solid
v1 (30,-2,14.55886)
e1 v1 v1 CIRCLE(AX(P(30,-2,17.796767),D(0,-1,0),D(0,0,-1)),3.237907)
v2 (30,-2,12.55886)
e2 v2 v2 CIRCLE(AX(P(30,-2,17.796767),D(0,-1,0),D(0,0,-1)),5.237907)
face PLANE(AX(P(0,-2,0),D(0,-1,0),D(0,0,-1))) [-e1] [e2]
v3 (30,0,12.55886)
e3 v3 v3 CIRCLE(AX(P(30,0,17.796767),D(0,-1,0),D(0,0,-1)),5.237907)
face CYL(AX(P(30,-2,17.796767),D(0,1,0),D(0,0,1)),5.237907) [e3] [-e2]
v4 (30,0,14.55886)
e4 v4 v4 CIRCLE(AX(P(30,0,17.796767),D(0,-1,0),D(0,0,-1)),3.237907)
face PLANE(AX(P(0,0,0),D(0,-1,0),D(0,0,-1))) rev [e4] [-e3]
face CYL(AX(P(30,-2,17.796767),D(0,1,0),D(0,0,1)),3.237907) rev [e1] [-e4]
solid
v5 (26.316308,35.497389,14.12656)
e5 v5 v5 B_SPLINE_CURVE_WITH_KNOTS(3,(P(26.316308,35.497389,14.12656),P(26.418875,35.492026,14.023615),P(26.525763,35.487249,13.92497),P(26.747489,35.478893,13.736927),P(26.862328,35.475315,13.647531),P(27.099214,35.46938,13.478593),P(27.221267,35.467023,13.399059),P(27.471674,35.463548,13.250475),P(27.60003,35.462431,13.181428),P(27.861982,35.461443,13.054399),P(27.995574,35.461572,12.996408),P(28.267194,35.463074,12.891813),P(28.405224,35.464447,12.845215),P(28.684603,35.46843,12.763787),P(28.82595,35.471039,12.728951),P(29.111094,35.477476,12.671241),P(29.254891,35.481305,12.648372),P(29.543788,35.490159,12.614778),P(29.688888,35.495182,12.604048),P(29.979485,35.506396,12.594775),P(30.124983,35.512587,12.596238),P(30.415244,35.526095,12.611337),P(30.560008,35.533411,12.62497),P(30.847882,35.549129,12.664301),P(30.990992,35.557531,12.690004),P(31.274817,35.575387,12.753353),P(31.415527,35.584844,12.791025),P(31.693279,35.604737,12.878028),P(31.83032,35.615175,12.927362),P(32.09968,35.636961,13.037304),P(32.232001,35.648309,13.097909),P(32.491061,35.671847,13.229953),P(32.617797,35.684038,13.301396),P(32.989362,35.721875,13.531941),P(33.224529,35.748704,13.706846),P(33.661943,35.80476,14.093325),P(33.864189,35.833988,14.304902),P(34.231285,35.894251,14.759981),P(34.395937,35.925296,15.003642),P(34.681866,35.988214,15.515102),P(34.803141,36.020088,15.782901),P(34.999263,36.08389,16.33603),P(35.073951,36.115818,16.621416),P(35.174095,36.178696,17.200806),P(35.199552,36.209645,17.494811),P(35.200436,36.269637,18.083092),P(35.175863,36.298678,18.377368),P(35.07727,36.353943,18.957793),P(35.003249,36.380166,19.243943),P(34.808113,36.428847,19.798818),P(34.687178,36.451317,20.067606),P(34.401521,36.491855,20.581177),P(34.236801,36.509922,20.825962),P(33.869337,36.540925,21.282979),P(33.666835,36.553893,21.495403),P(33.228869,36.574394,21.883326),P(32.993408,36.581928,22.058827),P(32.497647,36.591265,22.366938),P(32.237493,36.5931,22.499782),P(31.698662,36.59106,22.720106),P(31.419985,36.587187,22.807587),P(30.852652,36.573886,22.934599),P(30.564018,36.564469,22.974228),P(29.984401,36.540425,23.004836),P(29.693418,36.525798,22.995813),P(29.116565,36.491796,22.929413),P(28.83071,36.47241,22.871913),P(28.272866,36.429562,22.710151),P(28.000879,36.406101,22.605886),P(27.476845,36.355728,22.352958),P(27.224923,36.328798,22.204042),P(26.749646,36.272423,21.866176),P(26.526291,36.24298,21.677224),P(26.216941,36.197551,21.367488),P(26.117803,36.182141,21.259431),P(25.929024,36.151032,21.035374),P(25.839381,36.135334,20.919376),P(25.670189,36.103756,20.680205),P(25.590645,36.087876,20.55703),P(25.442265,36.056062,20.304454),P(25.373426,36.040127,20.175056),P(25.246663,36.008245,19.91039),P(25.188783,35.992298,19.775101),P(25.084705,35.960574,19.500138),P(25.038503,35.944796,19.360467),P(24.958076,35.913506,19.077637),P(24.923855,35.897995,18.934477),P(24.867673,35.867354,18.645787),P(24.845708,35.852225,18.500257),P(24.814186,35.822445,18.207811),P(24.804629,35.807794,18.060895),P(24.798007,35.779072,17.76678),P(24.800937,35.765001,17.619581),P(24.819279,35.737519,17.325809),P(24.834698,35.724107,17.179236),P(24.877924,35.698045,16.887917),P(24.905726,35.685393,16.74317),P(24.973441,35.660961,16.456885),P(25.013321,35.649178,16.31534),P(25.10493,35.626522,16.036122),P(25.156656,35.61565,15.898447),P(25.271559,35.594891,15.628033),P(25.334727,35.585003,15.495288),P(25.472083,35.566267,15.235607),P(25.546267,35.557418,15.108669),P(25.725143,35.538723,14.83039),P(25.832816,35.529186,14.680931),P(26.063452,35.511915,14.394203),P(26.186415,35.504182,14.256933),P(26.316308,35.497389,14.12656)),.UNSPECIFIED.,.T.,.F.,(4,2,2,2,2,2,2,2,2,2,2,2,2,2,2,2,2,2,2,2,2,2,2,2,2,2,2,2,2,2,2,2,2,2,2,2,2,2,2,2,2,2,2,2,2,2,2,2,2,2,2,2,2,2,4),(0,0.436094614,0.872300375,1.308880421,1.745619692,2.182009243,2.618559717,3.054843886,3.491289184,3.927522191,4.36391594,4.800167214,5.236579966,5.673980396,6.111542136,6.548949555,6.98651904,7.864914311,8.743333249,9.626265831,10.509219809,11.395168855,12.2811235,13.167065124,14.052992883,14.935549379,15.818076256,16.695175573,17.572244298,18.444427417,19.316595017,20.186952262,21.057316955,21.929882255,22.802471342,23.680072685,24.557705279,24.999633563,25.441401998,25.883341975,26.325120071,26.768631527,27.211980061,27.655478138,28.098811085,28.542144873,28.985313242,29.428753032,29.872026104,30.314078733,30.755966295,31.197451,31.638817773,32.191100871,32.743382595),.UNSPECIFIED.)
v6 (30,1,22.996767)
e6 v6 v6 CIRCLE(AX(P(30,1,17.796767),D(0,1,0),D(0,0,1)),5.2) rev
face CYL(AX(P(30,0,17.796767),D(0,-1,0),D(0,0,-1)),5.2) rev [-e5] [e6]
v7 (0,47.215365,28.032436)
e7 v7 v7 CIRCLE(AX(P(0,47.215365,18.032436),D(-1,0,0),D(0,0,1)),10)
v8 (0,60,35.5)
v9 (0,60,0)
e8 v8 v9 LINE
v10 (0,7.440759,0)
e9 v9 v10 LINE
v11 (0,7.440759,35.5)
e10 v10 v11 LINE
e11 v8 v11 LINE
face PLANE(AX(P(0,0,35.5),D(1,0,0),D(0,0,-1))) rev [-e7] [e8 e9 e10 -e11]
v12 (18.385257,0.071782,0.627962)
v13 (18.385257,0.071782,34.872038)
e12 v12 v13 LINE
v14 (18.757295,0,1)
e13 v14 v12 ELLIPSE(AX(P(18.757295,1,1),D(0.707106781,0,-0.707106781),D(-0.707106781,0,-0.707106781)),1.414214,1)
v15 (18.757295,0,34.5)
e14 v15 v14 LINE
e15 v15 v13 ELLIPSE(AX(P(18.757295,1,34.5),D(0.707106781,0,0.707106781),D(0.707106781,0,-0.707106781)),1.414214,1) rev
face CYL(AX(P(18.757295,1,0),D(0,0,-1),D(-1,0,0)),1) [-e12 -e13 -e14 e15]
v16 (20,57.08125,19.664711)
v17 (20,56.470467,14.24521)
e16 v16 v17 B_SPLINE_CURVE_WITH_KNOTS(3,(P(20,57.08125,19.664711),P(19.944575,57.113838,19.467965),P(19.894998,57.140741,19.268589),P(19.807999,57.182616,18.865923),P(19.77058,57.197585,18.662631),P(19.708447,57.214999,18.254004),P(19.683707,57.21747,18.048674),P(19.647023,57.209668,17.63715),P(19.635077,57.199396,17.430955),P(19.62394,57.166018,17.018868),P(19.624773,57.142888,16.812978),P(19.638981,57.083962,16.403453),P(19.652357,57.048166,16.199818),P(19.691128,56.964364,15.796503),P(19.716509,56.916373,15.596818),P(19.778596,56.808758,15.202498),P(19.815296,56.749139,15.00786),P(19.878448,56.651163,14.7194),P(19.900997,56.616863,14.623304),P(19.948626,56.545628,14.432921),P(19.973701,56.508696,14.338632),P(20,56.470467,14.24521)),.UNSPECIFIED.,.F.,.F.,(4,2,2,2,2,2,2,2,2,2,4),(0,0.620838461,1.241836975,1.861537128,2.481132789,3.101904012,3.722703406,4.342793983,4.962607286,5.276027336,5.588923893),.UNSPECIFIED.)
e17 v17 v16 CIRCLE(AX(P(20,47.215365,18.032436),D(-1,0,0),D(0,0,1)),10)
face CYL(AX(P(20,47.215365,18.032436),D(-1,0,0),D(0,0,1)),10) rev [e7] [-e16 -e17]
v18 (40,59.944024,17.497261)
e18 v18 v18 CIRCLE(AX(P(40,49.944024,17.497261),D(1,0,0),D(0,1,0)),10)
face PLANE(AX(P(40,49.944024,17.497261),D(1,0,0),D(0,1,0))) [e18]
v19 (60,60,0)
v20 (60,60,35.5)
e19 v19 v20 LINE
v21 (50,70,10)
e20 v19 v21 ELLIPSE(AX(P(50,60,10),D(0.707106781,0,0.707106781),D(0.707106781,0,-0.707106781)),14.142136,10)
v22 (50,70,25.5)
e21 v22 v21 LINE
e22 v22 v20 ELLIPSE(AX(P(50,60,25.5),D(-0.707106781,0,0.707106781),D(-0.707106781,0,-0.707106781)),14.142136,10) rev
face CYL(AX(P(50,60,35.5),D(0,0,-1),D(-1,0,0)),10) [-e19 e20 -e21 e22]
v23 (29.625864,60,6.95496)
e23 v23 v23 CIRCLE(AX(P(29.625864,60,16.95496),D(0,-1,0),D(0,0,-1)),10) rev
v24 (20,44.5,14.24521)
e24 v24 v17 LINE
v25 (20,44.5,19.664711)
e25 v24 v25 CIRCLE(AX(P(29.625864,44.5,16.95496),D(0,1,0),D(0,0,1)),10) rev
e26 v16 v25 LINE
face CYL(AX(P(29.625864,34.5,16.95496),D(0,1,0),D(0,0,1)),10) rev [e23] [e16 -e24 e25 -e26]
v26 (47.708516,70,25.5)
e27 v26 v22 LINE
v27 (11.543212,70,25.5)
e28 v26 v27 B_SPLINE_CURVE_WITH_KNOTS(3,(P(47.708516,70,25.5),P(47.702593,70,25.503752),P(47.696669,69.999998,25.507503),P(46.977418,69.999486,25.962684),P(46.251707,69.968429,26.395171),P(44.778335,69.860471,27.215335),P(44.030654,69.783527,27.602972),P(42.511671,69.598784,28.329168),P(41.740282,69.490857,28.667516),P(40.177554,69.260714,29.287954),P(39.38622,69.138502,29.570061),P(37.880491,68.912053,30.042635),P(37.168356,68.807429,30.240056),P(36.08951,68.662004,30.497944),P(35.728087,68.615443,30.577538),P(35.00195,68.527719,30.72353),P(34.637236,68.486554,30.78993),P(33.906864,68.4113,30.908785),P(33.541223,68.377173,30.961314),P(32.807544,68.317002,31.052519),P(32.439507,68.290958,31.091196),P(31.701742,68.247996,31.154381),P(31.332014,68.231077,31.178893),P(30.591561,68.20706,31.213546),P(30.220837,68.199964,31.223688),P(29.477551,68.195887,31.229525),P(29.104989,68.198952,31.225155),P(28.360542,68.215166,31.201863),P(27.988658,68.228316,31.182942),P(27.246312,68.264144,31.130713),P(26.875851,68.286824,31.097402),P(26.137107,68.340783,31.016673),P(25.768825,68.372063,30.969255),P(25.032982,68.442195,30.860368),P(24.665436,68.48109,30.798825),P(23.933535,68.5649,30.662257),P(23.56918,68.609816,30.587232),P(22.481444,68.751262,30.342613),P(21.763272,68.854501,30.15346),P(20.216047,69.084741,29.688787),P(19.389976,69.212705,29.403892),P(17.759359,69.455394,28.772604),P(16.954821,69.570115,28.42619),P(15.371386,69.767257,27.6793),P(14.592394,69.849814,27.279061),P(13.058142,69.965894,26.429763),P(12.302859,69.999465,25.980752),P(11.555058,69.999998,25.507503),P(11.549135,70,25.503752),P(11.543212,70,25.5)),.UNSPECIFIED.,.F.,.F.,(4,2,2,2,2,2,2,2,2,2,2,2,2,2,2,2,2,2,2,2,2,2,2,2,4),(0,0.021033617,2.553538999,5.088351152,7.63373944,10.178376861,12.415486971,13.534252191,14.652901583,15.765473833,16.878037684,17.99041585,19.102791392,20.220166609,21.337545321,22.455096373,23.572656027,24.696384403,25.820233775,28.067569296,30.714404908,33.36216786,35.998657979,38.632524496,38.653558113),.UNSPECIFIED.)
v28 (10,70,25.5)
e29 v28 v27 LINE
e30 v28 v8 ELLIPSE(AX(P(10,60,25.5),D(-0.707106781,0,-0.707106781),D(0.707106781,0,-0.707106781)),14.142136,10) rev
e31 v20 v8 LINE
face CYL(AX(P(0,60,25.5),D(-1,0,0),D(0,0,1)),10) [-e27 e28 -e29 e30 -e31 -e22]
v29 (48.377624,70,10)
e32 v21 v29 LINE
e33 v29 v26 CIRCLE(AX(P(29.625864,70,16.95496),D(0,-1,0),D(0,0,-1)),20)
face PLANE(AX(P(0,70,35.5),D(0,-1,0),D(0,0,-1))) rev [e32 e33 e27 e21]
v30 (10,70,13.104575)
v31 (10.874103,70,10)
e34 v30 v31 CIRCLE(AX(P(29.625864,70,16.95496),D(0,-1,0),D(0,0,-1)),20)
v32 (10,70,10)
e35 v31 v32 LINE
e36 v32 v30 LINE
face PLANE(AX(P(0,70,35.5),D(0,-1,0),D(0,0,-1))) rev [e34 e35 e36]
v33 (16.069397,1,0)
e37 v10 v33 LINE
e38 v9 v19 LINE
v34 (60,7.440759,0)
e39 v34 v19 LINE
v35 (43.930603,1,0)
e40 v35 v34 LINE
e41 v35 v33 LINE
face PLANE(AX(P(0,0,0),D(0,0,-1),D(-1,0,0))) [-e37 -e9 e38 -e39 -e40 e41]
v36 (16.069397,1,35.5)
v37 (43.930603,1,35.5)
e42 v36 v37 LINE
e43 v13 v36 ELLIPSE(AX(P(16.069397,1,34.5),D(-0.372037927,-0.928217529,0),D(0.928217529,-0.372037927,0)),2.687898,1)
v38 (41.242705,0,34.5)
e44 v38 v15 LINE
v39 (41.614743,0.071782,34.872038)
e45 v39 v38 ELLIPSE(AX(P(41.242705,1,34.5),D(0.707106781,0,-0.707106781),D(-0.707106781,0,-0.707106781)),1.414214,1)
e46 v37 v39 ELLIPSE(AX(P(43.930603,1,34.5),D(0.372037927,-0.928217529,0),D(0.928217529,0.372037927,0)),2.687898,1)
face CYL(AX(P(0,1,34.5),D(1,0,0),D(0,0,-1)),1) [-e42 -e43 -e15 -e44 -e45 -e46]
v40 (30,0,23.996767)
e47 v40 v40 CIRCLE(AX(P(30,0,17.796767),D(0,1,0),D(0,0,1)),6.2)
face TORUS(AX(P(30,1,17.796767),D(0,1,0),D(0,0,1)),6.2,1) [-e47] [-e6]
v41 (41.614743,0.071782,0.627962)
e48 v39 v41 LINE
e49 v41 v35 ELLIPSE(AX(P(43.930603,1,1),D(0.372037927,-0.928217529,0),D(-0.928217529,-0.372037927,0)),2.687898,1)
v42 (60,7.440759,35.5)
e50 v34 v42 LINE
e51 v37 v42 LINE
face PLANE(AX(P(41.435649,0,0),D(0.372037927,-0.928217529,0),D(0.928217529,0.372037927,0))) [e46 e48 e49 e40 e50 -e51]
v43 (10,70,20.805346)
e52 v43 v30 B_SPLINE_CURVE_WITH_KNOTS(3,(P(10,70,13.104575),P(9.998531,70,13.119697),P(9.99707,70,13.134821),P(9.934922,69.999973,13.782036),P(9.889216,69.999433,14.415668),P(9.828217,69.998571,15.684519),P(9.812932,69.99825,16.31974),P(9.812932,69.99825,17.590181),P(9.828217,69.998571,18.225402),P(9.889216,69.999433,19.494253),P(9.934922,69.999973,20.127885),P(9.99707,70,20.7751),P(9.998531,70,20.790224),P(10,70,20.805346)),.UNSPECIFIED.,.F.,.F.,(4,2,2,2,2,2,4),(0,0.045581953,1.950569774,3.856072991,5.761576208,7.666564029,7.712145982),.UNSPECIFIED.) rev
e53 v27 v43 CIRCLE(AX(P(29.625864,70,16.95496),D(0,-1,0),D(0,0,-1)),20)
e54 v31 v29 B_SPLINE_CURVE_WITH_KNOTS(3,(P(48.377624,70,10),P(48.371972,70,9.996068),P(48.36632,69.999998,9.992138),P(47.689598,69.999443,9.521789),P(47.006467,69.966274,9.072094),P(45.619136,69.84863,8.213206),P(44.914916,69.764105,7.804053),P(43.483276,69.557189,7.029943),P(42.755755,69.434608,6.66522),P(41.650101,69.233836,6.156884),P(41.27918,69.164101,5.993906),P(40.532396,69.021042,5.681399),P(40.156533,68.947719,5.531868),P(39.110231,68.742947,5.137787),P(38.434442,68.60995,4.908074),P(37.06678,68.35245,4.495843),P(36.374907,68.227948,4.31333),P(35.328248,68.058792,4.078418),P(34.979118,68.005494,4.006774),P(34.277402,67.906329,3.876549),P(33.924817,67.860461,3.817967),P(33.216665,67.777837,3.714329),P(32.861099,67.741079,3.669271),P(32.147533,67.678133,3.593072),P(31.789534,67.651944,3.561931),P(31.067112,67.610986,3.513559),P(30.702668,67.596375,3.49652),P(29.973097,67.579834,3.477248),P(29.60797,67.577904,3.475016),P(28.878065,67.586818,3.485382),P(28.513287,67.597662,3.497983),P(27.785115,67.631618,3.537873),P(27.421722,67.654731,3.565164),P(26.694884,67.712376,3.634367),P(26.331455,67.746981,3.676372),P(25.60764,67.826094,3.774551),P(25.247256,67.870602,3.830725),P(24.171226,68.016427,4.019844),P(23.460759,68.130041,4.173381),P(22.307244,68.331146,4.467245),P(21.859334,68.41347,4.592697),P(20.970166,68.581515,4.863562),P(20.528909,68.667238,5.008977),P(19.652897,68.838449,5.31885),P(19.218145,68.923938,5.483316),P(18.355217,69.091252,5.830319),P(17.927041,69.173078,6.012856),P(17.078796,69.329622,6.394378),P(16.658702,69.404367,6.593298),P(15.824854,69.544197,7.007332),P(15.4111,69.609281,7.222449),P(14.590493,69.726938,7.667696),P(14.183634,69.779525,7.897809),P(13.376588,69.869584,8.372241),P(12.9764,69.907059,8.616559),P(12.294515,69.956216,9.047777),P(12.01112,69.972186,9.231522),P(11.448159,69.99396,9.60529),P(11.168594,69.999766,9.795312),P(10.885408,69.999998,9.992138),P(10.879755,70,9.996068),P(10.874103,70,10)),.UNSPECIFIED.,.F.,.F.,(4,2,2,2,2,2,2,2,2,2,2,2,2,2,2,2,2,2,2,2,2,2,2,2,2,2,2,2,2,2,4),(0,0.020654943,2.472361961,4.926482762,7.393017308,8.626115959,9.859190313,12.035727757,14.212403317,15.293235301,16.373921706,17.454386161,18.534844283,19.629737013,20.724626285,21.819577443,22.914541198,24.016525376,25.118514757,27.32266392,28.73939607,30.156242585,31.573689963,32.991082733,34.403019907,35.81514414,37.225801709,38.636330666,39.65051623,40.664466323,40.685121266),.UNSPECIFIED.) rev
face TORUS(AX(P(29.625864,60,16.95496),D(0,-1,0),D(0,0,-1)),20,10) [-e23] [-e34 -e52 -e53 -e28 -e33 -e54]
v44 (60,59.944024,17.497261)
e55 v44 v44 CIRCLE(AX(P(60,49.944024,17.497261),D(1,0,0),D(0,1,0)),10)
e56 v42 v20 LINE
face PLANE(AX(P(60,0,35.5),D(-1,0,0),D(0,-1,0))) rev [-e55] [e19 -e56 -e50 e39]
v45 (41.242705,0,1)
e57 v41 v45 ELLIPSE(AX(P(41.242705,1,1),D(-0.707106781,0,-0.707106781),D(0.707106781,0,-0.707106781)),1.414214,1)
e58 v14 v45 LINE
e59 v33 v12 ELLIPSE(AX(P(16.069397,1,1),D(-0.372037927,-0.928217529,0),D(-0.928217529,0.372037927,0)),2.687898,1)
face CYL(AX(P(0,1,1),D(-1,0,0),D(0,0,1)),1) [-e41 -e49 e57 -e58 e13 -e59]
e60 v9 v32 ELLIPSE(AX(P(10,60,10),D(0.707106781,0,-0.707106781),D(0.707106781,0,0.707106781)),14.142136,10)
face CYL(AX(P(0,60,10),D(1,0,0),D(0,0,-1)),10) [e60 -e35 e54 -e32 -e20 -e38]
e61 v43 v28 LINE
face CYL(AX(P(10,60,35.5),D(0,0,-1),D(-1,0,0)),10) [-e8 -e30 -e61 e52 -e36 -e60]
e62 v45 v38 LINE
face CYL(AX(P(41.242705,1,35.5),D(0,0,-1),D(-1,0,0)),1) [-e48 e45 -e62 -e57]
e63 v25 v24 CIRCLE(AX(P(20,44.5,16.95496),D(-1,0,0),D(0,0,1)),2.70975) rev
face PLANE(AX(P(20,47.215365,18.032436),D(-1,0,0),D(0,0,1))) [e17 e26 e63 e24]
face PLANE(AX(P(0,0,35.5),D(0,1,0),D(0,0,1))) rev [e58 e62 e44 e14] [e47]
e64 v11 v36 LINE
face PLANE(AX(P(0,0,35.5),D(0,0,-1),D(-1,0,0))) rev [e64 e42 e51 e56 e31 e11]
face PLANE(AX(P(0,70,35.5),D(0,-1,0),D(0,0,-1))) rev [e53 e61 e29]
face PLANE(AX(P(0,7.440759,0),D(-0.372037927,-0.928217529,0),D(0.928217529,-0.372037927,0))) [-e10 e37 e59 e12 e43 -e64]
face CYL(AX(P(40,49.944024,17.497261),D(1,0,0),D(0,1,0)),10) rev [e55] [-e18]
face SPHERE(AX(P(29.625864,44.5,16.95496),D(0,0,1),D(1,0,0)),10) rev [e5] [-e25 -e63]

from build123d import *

# Parameters (mm, degrees)
SKETCH1_W                                  = 60
SKETCH1_H                                  = 70
BOSS_EXTRUDE1_DEPTH                        = 35.5
SKETCH3_R                                  = 10
CUT_EXTRUDE1_DEPTH                         = 35.5
FILLET1_R                                  = 10
SKETCH6_R                                  = 10
CUT_EXTRUDE6_DEPTH                         = 20
SKETCH7_R                                  = 10
CUT_EXTRUDE7_DEPTH                         = 20
CUT_EXTRUDE_THIN4_DEPTH                    = 99.793977717
CSK_FOR_M5_FLAT_HEAD_MACHINE_SCREW1_OUTL_R = 5.2
CSK_FOR_M5_FLAT_HEAD_MACHINE_SCREW1_DEPTH  = 36.592353538
FILLET2_R                                  = 1
SKETCH14_R                                 = 5.237907484
SKETCH14_R_2                               = 3.237907484
BOSS_EXTRUDE2_DEPTH                        = 2


# Read off the part's stored shape, not the designer's step: CSK for M5 Flat Head Machine Screw1
with BuildPart() as part:
    # Sketch1 → Boss-Extrude1 (new body)
    with BuildSketch(Plane.XY):
        with Locations((30, 35)):
            Rectangle(SKETCH1_W, SKETCH1_H)
    extrude(amount=BOSS_EXTRUDE1_DEPTH)

    # Sketch3 → Cut-Extrude1 (cut)
    with BuildSketch(Plane(origin=(0, 70, 0), x_dir=(1, 0, 0), z_dir=(0, 1, 0))):
        with Locations(Location((29.625863751, -16.954960471, 0), (0, 0, 270))):
            Circle(SKETCH3_R)
    extrude(amount=-CUT_EXTRUDE1_DEPTH, mode=Mode.SUBTRACT)

    # Fillet1
    # the kernel refuses this fillet: 10 mm, written as the material it adds along each edge
    with BuildSketch(Plane(origin=(29.625863751, 34.5, 16.954960471), x_dir=(0, 0, 1), z_dir=(-1, 0, 0))) as fillet1_piece_1:
        with BuildLine():
            CenterArc((10 - FILLET1_R, FILLET1_R), FILLET1_R, 270, 90)
            Line((10 - FILLET1_R, 0), (10, 0))
            Line((10, 0), (10, FILLET1_R))
        make_face()
    revolve(axis=Axis((29.625863751, 34.5, 16.954960471), (0, 1, 0)))
    # the kernel refuses this fillet: 10 mm, written as the material it takes off along each edge
    with BuildSketch(Plane(origin=(85, 70, 35.5), x_dir=(0, -1, 0), z_dir=(-1, 0, 0))) as fillet1_2_piece_1:
        with BuildLine():
            CenterArc((FILLET1_R, -FILLET1_R), FILLET1_R, 90, 90)
            Line((0, -FILLET1_R), (0, 0))
            Line((0, 0), (FILLET1_R, 0))
        make_face()
    extrude(amount=110, mode=Mode.SUBTRACT)
    with BuildSketch(Plane(origin=(29.625863751, 70, 16.954960471), x_dir=(0, 0, 1), z_dir=(-1, 0, 0))) as fillet1_2_piece_2:
        with BuildLine():
            CenterArc((10 + FILLET1_R, -FILLET1_R), FILLET1_R, 90, 90)
            Line((10, -FILLET1_R), (10, 0))
            Line((10, 0), (10 + FILLET1_R, 0))
        make_face()
    revolve(axis=Axis((29.625863751, 70, 16.954960471), (0, 1, 0)), mode=Mode.SUBTRACT)
    with BuildSketch(Plane(origin=(85, 70, 0), x_dir=(0, -1, 0), z_dir=(-1, 0, 0))) as fillet1_2_piece_3:
        with BuildLine():
            CenterArc((FILLET1_R, FILLET1_R), FILLET1_R, 180, 90)
            Line((0, FILLET1_R), (0, 0))
            Line((0, 0), (FILLET1_R, 0))
        make_face()
    extrude(amount=110, mode=Mode.SUBTRACT)
    with BuildSketch(Plane(origin=(0, 70, -25), x_dir=(0, -1, 0), z_dir=(0, 0, 1))) as fillet1_2_piece_4:
        with BuildLine():
            CenterArc((FILLET1_R, FILLET1_R), FILLET1_R, 180, 90)
            Line((0, FILLET1_R), (0, 0))
            Line((0, 0), (FILLET1_R, 0))
        make_face()
    extrude(amount=85.5, mode=Mode.SUBTRACT)
    with BuildSketch(Plane(origin=(60, 70, -25), x_dir=(0, -1, 0), z_dir=(0, 0, 1))) as fillet1_2_piece_5:
        with BuildLine():
            CenterArc((FILLET1_R, -FILLET1_R), FILLET1_R, 90, 90)
            Line((0, -FILLET1_R), (0, 0))
            Line((0, 0), (FILLET1_R, 0))
        make_face()
    extrude(amount=85.5, mode=Mode.SUBTRACT)

    # Sketch6 → Cut-Extrude6 (cut)
    with BuildSketch(Plane(origin=(60, 0, 0), x_dir=(0, 0, -1), z_dir=(1, 0, 0))):
        with Locations(Location((-17.49726075, 49.944024106, 0), (0, 0, 90))):
            Circle(SKETCH6_R)
    extrude(amount=-CUT_EXTRUDE6_DEPTH, mode=Mode.SUBTRACT)

    # Sketch7 → Cut-Extrude7 (cut)
    with BuildSketch(Plane.ZY):
        with Locations((18.032436188, 47.215365125)):
            Circle(SKETCH7_R)
    extrude(amount=-CUT_EXTRUDE7_DEPTH, mode=Mode.SUBTRACT)

    # Sketch11 → Cut-Extrude-Thin4 (cut, through all)
    with BuildSketch(Plane.XY.offset(35.5)):
        Polygon((0, 7.440758534), (18.56435058, 0), (14.843971313, -9.28217529), (-3.720379267, -1.841416756), align=None)
        Polygon((41.43564942, 0), (60, 7.440758534), (63.720379267, -1.841416756), (45.156028687, -9.28217529), align=None)
    extrude(amount=-CUT_EXTRUDE_THIN4_DEPTH, mode=Mode.SUBTRACT)

    # CSK for M5 Flat Head Machine Screw1 outl → CSK for M5 Flat Head Machine Screw1 (cut)
    with BuildSketch(Plane(origin=(0, 0, 0), x_dir=(1, 0, 0), z_dir=(0, 1, 0))):
        with Locations((30, -17.796767031)):
            Circle(CSK_FOR_M5_FLAT_HEAD_MACHINE_SCREW1_OUTL_R)
    extrude(amount=CSK_FOR_M5_FLAT_HEAD_MACHINE_SCREW1_DEPTH, mode=Mode.SUBTRACT)

    # Fillet2
    fillet2_edges = [part.edges().sort_by_distance(p)[0] for p in [
        (30, 0, 0),
        (30, 0, 35.5),
        (18.56435058, 0, 17.75),
        (41.43564942, 0, 17.75),
        (24.8, 0, 17.796767031),
    ]]
    fillet(fillet2_edges, radius=FILLET2_R)


with BuildPart() as body_2:
    # Sketch14 → Boss-Extrude2 (new body)
    with BuildSketch(Plane.XZ):
        with Locations(Location((30, 17.796767031, 0), (0, 0, 270))):
            Circle(SKETCH14_R)
        with Locations(Location((30, 17.796767031, 0), (0, 0, 270))):
            Circle(SKETCH14_R_2, mode=Mode.SUBTRACT)
    extrude(amount=BOSS_EXTRUDE2_DEPTH)


solid = Compound([part.part, body_2.part])
